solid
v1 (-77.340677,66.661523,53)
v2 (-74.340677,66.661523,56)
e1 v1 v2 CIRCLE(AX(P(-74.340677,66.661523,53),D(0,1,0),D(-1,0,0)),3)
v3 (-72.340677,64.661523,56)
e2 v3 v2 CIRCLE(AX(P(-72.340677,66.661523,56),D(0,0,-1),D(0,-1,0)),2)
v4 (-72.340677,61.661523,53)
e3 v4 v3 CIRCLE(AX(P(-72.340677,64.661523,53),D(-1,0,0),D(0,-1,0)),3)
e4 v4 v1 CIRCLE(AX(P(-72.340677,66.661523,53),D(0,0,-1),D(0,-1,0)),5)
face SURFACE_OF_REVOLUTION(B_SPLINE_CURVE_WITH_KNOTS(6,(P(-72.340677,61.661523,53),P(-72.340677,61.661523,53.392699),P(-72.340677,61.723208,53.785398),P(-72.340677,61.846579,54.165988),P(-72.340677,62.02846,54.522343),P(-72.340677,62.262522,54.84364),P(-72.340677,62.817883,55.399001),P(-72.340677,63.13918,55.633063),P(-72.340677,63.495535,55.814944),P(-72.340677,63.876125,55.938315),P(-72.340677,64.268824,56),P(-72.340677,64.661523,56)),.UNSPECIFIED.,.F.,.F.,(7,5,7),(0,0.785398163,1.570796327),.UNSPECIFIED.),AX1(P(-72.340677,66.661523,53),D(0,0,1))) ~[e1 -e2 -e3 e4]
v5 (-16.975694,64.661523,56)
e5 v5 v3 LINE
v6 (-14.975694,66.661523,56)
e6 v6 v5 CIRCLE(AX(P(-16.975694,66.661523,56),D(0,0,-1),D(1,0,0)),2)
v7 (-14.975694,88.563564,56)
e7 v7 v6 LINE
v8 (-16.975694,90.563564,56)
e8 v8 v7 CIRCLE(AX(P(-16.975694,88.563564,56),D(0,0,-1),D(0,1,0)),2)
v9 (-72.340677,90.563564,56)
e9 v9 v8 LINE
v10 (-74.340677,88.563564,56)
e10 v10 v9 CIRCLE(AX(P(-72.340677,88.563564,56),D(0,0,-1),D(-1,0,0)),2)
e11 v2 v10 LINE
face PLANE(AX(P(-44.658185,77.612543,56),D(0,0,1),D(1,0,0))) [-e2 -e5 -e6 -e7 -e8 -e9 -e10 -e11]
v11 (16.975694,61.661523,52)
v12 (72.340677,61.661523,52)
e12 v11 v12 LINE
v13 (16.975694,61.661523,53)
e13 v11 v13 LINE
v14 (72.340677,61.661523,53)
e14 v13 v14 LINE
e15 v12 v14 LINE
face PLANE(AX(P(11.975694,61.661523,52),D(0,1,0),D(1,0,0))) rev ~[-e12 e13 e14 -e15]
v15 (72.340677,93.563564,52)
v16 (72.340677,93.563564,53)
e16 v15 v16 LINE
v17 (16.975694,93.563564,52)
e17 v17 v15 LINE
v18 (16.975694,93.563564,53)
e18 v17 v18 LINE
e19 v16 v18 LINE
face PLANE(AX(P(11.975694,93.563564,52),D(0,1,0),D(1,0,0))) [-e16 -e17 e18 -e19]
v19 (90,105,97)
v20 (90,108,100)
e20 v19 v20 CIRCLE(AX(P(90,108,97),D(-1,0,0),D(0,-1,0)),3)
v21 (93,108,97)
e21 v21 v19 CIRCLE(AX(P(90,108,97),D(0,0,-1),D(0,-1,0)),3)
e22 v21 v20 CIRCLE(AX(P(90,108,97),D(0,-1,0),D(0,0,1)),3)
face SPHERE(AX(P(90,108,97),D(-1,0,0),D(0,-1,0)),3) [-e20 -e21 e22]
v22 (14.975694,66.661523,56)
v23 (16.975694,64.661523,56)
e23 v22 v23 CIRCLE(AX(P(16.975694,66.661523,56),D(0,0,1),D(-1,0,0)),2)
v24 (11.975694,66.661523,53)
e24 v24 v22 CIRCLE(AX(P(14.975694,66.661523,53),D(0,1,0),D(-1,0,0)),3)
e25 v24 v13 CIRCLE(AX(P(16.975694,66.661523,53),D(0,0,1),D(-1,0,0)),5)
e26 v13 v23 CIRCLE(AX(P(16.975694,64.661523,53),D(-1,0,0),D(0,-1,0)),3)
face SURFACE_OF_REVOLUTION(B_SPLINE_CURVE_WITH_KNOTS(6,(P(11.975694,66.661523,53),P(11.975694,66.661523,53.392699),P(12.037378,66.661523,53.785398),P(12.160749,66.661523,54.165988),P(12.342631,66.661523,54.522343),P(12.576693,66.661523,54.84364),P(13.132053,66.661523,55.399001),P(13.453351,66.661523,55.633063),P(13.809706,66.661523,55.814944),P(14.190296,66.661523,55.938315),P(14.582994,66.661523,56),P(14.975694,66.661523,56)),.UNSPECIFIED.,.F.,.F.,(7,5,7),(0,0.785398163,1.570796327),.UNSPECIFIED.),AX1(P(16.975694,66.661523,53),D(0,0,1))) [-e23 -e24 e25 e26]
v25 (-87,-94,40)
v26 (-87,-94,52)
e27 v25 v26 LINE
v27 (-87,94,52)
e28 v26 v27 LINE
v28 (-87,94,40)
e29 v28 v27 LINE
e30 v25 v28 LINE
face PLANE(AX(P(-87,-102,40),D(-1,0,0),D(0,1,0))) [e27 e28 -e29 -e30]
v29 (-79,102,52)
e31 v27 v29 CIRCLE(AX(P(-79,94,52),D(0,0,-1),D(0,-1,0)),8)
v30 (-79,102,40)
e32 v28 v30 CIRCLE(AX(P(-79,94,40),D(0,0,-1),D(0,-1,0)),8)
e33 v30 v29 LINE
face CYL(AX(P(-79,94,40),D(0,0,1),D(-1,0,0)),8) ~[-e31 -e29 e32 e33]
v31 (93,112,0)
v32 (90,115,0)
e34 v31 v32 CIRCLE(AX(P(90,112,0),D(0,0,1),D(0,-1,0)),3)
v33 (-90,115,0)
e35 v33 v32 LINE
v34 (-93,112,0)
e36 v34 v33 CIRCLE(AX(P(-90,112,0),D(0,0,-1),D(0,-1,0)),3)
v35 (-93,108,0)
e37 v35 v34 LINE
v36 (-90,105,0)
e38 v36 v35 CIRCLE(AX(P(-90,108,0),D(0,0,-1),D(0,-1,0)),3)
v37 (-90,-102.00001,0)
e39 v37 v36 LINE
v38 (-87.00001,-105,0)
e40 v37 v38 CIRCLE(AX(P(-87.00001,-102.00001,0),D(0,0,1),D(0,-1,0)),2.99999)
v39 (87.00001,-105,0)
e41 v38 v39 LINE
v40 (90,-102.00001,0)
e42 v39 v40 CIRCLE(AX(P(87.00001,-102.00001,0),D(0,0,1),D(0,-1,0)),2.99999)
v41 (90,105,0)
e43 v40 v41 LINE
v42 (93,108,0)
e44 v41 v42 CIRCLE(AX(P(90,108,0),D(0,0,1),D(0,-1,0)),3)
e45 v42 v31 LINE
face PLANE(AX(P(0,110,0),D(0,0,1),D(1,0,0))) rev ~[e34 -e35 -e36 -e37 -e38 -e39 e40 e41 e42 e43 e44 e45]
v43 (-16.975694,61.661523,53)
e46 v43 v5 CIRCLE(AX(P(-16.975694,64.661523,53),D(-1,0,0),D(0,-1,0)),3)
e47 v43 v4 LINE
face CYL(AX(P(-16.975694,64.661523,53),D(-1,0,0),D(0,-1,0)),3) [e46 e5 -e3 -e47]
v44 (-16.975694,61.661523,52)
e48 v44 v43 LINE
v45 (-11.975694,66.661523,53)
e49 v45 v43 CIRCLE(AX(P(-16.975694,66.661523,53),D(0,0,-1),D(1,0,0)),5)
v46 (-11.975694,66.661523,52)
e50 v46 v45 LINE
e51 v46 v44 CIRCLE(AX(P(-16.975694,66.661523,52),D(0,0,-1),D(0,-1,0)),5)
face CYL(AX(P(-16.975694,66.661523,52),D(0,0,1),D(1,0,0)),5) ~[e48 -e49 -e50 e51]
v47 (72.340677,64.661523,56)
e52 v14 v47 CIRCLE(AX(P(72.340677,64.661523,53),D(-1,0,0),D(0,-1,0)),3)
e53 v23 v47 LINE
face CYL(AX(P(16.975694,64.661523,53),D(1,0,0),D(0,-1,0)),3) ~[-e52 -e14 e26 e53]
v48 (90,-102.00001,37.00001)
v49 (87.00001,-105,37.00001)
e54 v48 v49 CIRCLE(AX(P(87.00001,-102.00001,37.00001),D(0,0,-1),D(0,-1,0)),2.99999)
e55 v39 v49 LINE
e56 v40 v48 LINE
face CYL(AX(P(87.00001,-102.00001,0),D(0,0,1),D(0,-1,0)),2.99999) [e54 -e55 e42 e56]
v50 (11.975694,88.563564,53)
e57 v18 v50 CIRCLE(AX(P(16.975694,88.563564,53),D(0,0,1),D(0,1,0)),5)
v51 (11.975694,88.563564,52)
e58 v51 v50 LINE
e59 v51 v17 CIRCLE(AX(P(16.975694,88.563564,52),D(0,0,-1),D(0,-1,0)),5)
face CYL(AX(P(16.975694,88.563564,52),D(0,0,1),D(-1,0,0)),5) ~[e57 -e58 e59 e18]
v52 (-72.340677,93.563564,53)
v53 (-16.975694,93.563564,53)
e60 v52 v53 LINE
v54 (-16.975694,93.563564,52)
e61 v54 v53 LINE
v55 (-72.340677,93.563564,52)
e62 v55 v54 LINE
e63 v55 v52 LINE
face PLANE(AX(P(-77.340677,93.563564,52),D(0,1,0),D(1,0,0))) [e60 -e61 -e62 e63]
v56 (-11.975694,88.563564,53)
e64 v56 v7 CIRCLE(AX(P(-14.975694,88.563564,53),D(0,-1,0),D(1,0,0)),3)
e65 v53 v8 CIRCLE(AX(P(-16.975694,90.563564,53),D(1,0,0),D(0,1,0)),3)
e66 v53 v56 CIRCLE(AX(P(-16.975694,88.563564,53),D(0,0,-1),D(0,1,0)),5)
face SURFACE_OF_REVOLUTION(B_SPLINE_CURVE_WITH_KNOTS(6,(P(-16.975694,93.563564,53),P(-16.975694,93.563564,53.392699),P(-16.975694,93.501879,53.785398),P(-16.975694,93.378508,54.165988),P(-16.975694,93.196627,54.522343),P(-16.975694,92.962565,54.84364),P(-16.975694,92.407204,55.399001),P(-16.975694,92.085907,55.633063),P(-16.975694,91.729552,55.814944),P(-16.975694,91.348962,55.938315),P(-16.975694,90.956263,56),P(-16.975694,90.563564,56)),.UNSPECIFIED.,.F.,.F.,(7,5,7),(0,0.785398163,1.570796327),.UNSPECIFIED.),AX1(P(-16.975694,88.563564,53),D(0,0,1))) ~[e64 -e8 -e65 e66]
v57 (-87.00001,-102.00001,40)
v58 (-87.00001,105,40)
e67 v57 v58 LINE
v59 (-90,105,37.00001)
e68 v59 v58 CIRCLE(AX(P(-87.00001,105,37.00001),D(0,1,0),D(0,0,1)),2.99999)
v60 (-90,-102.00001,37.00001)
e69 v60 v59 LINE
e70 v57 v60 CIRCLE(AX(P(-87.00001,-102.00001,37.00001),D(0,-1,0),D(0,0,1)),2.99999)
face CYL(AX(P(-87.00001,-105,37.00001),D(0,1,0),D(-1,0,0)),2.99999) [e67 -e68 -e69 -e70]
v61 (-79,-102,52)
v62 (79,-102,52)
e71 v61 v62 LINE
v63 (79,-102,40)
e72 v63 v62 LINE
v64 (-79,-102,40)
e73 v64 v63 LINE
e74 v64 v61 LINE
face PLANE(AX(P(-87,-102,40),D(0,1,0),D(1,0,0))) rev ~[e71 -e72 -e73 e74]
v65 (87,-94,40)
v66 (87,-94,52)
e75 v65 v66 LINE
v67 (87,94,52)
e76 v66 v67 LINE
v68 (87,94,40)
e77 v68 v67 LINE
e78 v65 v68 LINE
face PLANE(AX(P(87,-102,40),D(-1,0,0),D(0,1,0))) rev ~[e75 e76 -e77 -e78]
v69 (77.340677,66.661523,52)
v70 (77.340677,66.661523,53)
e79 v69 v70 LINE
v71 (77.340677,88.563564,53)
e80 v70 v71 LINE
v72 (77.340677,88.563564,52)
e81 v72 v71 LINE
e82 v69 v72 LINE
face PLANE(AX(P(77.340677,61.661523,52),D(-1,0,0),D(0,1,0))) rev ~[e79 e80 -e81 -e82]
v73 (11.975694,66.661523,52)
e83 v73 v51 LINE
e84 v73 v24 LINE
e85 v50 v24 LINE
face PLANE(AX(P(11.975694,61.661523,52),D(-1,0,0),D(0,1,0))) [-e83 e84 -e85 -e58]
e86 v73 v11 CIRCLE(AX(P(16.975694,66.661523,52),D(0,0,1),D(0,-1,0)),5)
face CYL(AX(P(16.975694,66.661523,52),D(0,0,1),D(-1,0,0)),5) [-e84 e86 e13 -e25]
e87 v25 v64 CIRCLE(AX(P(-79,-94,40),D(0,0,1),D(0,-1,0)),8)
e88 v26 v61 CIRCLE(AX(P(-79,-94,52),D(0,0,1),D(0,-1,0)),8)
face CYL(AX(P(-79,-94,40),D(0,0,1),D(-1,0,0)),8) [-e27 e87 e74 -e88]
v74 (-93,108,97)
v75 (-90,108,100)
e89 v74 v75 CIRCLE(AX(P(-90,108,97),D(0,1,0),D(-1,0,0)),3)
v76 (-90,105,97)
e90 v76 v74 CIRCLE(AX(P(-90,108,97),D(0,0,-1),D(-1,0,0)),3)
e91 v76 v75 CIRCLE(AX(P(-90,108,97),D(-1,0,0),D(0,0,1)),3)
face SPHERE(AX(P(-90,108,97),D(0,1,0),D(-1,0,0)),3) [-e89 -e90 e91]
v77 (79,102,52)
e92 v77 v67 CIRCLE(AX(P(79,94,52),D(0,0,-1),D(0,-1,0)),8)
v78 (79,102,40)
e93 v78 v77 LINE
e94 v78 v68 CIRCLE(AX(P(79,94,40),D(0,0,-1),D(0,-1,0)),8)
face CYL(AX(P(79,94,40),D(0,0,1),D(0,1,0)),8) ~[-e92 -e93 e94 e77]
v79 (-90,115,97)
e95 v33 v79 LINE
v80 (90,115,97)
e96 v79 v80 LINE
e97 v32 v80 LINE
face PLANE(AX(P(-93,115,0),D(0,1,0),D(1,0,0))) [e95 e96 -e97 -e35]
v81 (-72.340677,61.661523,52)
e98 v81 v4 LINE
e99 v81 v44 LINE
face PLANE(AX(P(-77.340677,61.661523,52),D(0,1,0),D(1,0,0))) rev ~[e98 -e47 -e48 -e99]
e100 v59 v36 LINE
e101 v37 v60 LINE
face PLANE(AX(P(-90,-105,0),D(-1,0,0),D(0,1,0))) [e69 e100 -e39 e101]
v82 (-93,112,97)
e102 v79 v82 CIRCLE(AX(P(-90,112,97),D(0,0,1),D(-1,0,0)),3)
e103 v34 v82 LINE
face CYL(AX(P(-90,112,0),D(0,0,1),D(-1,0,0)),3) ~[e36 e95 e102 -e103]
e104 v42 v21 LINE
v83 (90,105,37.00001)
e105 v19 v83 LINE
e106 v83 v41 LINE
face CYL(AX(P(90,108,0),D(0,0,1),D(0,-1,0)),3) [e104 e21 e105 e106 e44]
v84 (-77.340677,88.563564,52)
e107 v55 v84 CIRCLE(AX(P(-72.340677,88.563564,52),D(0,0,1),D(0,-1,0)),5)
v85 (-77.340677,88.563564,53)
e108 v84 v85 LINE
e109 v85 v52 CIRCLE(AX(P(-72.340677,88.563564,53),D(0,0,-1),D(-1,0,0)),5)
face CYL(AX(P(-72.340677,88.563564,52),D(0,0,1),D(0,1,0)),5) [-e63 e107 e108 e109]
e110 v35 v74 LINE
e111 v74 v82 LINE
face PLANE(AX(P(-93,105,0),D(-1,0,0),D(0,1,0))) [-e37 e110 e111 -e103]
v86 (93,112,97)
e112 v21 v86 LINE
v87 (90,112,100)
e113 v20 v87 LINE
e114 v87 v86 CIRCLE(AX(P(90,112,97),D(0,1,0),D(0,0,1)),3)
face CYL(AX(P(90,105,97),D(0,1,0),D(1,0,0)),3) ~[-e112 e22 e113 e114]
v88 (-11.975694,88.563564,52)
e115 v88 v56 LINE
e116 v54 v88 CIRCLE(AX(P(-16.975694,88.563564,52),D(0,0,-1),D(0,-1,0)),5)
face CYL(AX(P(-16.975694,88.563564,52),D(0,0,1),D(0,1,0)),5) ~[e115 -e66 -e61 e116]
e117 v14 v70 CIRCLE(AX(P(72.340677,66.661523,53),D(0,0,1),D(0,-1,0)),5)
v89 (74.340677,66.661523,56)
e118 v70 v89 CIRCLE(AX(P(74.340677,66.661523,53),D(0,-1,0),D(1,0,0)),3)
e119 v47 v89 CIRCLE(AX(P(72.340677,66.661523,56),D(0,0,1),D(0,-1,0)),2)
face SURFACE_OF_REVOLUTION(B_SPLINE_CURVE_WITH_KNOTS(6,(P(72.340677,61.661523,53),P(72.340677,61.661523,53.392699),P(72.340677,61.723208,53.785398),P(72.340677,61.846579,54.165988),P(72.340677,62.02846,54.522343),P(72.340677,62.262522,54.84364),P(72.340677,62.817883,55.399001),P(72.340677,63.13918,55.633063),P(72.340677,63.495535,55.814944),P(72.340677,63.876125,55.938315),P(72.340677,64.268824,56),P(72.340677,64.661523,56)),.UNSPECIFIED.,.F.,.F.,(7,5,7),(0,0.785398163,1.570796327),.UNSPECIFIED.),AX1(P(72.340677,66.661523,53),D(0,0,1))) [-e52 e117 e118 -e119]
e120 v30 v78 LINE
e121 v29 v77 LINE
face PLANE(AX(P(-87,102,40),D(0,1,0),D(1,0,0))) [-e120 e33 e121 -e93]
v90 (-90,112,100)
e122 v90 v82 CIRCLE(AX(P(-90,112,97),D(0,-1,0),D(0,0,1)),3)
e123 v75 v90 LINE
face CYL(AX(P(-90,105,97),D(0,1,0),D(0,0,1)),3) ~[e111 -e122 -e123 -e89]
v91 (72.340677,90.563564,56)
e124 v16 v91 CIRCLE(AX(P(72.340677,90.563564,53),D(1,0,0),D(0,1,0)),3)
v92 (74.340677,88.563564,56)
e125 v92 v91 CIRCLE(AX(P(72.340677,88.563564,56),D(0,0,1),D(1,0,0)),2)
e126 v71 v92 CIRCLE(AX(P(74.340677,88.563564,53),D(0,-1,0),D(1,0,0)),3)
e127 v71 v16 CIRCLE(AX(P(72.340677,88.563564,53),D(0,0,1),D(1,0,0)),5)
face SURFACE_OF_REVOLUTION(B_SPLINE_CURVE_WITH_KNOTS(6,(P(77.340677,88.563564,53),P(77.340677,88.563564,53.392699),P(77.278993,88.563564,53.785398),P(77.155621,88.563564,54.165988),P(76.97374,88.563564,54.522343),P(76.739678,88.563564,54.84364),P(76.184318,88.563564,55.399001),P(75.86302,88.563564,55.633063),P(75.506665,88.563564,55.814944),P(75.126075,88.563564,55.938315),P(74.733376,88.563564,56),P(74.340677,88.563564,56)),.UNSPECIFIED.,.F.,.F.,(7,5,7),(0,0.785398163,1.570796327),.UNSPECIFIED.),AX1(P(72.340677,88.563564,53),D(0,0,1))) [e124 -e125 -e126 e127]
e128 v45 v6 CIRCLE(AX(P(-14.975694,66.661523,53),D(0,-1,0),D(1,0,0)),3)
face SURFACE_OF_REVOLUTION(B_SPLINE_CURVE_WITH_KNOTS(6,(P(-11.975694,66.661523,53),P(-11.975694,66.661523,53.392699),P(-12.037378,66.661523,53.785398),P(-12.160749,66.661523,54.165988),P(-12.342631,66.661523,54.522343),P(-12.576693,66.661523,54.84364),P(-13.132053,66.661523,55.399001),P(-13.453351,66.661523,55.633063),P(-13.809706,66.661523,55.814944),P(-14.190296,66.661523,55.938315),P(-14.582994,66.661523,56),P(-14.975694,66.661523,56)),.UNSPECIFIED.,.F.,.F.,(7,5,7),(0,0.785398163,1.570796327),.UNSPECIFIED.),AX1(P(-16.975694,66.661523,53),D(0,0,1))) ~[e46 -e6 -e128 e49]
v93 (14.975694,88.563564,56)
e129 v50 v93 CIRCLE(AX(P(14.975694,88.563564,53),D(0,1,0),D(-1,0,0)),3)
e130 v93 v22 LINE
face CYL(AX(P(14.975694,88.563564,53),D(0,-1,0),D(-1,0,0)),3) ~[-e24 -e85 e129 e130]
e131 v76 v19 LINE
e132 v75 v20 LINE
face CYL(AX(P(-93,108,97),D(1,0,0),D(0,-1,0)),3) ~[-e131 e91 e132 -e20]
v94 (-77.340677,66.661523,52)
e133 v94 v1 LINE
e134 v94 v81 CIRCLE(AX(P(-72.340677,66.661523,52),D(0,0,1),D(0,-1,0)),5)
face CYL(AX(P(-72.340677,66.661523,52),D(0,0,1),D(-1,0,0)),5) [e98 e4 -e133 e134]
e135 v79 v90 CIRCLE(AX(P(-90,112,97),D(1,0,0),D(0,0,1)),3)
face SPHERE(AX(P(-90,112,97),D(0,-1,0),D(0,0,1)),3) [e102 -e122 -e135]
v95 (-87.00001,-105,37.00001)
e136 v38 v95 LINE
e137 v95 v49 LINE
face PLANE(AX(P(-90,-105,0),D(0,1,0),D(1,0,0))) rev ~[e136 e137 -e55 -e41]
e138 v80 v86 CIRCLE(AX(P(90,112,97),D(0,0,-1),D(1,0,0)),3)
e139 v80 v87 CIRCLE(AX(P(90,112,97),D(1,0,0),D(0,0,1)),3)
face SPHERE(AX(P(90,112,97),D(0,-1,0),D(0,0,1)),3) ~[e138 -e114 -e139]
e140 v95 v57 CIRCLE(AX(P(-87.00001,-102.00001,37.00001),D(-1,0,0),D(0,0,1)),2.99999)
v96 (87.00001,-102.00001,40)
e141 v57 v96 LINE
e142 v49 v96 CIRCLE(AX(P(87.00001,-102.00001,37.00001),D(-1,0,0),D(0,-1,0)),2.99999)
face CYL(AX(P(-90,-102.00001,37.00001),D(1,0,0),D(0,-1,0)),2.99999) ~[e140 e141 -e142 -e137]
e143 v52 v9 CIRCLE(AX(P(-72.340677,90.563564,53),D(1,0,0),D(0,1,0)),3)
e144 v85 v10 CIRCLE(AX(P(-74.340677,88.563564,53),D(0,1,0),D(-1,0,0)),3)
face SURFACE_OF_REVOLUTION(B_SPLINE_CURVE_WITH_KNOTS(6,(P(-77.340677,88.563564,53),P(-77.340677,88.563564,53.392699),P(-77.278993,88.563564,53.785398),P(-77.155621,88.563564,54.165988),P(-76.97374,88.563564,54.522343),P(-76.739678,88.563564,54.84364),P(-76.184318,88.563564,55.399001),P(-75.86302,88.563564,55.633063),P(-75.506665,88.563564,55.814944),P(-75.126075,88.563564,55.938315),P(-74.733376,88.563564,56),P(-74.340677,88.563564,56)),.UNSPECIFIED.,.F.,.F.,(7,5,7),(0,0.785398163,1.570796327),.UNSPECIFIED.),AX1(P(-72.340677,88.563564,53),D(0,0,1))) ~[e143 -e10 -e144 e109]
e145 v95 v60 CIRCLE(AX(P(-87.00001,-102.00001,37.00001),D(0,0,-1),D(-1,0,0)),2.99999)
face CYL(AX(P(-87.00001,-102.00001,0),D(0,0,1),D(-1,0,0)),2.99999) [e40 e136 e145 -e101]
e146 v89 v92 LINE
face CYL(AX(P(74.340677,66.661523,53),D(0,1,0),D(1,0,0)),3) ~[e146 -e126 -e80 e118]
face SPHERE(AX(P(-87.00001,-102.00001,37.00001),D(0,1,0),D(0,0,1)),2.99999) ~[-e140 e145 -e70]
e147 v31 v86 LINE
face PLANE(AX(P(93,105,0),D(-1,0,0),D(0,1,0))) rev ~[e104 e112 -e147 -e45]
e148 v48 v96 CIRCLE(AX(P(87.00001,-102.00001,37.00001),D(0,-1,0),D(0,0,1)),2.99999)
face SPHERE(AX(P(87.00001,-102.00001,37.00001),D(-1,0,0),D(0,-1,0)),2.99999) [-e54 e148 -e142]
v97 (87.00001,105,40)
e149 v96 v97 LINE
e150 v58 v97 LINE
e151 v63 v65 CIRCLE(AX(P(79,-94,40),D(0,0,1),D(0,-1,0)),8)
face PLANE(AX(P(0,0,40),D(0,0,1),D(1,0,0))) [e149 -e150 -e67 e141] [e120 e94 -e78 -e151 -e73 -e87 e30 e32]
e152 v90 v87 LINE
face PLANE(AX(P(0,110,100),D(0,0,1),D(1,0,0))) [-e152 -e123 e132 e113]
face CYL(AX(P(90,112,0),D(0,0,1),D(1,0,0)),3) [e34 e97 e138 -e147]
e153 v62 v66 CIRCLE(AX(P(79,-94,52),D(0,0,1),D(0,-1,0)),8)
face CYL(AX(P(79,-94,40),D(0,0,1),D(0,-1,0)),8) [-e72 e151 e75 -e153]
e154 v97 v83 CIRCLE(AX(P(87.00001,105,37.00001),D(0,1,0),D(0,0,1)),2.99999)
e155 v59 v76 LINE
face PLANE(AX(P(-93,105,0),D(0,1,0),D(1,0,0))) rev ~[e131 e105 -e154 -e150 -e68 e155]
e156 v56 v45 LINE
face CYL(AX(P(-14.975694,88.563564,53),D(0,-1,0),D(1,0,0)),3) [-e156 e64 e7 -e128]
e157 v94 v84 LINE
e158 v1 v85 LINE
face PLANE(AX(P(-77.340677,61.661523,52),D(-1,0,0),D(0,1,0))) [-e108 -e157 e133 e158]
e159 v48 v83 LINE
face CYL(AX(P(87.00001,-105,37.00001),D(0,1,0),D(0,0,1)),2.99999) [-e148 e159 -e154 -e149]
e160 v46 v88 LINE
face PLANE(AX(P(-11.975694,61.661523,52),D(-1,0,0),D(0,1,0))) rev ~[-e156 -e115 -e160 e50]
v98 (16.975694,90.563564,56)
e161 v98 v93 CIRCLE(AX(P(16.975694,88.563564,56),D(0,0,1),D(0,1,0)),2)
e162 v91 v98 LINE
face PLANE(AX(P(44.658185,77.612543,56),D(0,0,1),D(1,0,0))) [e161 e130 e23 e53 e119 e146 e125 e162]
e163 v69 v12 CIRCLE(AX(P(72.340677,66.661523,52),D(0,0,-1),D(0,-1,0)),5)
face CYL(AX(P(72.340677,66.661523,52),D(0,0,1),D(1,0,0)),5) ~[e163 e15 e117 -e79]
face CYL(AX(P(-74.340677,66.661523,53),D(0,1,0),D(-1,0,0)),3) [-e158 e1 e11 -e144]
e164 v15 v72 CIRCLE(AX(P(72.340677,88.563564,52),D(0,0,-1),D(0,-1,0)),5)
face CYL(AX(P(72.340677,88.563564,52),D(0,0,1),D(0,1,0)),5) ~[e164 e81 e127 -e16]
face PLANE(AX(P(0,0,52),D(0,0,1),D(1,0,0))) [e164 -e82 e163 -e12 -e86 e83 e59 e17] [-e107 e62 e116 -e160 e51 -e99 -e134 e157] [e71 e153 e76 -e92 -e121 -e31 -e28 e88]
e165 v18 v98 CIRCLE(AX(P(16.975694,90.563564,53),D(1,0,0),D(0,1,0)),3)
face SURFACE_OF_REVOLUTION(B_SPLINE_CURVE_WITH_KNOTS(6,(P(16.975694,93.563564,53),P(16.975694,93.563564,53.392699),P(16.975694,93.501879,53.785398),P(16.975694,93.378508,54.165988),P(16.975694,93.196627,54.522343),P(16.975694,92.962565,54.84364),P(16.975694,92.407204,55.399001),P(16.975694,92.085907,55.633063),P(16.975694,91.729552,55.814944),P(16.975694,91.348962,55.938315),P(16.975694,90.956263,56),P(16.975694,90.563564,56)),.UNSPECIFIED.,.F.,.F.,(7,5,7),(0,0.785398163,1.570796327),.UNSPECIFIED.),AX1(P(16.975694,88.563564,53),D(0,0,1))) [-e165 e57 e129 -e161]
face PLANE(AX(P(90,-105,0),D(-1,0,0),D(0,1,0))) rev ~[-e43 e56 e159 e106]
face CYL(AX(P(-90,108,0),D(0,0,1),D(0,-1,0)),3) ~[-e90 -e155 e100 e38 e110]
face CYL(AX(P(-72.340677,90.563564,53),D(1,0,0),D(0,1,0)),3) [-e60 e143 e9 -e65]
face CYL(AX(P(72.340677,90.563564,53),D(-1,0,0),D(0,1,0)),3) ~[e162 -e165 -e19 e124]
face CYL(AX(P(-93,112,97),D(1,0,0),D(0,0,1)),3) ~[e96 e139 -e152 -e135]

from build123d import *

# Parameters (mm, degrees)
F0_W     = 180
F0_H     = 210
F1_DEPTH = 40
F2_W     = 186
F2_H     = 10
F3_DEPTH = 100
F4_W     = 174
F4_H     = 204
F5_DEPTH = 12
F6_W     = 65.3649838641
F6_H     = 31.9020412862
F7_DEPTH = 4
F8_DEPTH = 4
F9_R     = 8
F10_R    = 3
F11_R    = 2.99999
F12_R    = 5
F13_R    = 3


# Not quite as in the source:
# - a fillet or chamfer is up to 0.001 mm smaller than in the source, because OpenCascade refuses the exact size


with BuildPart() as f1:
    # F0 (on Top) → F1 (new body)
    with BuildSketch(Plane.XY):
        Rectangle(F0_W, F0_H)
    extrude(amount=F1_DEPTH)

    # F2 (on Top) → F3 (join)
    with BuildSketch(Plane.XY):
        with Locations((0, 110)):
            Rectangle(F2_W, F2_H)
    extrude(amount=F3_DEPTH)

    # F4 (on face) → F5 (join)
    with BuildSketch(Plane.XY.offset(40)):
        Rectangle(F4_W, F4_H)
    extrude(amount=F5_DEPTH)

    # F6 (on face) → F7 (join)
    with BuildSketch(Plane.XY.offset(52)):
        with Locations((-44.6581854485, 77.6125434786)):
            Rectangle(F6_W, F6_H)
    extrude(amount=F7_DEPTH)

    # F6 (on face) → F8 (join)
    with BuildSketch(Plane.XY.offset(52)):
        with Locations((-44.6581854485, 77.6125434786)):
            Rectangle(F6_W, F6_H)
        with Locations((44.6581854485, 77.6125434786)):
            Rectangle(F6_W, F6_H)
    extrude(amount=F8_DEPTH)

    # F9
    f9_edges = [f1.edges().sort_by_distance(p)[0] for p in [
        (-87, -102, 46),
        (87, -102, 46),
        (87, 102, 46),
        (-87, 102, 46),
    ]]
    fillet(f9_edges, radius=F9_R)

    # F10
    f10_edges = [f1.edges().sort_by_distance(p)[0] for p in [
        (-93, 110, 100),
        (-93, 105, 50),
        (0, 105, 100),
        (93, 105, 50),
        (93, 110, 100),
        (0, 115, 100),
        (-93, 115, 50),
        (93, 115, 50),
    ]]
    fillet(f10_edges, radius=F10_R)

    # F11 (radius 3 in the source; OpenCascade refuses exactly that, so slightly less here)
    f11_edges = [f1.edges().sort_by_distance(p)[0] for p in [
        (-90, 0, 40),
        (0, -105, 40),
        (-90, -105, 20),
        (90, -105, 20),
        (90, 0, 40),
    ]]
    fillet(f11_edges, radius=F11_R)

    # F12
    f12_edges = [f1.edges().sort_by_distance(p)[0] for p in [
        (-77.340677, 61.661523, 54),
        (-11.975694, 61.661523, 54),
        (-11.975694, 93.563564, 54),
        (-77.340677, 93.563564, 54),
        (11.975694, 93.563564, 54),
        (11.975694, 61.661523, 54),
        (77.340677, 61.661523, 54),
        (77.340677, 93.563564, 54),
    ]]
    fillet(f12_edges, radius=F12_R)

    # F13
    f13_edges = [f1.edges().sort_by_distance(p)[0] for p in [
        (77.340677, 77.612543, 56),
        (75.876211, 63.125989, 56),
        (75.876211, 92.099098, 56),
        (44.658185, 61.661523, 56),
        (44.658185, 93.563564, 56),
        (13.44016, 63.125989, 56),
        (13.44016, 92.099098, 56),
        (11.975694, 77.612543, 56),
        (-44.658185, 93.563564, 56),
        (-13.44016, 92.099098, 56),
        (-75.876211, 92.099098, 56),
        (-11.975694, 77.612543, 56),
        (-77.340677, 77.612543, 56),
        (-13.44016, 63.125989, 56),
        (-75.876211, 63.125989, 56),
        (-44.658185, 61.661523, 56),
    ]]
    fillet(f13_edges, radius=F13_R)


solid = f1.part
